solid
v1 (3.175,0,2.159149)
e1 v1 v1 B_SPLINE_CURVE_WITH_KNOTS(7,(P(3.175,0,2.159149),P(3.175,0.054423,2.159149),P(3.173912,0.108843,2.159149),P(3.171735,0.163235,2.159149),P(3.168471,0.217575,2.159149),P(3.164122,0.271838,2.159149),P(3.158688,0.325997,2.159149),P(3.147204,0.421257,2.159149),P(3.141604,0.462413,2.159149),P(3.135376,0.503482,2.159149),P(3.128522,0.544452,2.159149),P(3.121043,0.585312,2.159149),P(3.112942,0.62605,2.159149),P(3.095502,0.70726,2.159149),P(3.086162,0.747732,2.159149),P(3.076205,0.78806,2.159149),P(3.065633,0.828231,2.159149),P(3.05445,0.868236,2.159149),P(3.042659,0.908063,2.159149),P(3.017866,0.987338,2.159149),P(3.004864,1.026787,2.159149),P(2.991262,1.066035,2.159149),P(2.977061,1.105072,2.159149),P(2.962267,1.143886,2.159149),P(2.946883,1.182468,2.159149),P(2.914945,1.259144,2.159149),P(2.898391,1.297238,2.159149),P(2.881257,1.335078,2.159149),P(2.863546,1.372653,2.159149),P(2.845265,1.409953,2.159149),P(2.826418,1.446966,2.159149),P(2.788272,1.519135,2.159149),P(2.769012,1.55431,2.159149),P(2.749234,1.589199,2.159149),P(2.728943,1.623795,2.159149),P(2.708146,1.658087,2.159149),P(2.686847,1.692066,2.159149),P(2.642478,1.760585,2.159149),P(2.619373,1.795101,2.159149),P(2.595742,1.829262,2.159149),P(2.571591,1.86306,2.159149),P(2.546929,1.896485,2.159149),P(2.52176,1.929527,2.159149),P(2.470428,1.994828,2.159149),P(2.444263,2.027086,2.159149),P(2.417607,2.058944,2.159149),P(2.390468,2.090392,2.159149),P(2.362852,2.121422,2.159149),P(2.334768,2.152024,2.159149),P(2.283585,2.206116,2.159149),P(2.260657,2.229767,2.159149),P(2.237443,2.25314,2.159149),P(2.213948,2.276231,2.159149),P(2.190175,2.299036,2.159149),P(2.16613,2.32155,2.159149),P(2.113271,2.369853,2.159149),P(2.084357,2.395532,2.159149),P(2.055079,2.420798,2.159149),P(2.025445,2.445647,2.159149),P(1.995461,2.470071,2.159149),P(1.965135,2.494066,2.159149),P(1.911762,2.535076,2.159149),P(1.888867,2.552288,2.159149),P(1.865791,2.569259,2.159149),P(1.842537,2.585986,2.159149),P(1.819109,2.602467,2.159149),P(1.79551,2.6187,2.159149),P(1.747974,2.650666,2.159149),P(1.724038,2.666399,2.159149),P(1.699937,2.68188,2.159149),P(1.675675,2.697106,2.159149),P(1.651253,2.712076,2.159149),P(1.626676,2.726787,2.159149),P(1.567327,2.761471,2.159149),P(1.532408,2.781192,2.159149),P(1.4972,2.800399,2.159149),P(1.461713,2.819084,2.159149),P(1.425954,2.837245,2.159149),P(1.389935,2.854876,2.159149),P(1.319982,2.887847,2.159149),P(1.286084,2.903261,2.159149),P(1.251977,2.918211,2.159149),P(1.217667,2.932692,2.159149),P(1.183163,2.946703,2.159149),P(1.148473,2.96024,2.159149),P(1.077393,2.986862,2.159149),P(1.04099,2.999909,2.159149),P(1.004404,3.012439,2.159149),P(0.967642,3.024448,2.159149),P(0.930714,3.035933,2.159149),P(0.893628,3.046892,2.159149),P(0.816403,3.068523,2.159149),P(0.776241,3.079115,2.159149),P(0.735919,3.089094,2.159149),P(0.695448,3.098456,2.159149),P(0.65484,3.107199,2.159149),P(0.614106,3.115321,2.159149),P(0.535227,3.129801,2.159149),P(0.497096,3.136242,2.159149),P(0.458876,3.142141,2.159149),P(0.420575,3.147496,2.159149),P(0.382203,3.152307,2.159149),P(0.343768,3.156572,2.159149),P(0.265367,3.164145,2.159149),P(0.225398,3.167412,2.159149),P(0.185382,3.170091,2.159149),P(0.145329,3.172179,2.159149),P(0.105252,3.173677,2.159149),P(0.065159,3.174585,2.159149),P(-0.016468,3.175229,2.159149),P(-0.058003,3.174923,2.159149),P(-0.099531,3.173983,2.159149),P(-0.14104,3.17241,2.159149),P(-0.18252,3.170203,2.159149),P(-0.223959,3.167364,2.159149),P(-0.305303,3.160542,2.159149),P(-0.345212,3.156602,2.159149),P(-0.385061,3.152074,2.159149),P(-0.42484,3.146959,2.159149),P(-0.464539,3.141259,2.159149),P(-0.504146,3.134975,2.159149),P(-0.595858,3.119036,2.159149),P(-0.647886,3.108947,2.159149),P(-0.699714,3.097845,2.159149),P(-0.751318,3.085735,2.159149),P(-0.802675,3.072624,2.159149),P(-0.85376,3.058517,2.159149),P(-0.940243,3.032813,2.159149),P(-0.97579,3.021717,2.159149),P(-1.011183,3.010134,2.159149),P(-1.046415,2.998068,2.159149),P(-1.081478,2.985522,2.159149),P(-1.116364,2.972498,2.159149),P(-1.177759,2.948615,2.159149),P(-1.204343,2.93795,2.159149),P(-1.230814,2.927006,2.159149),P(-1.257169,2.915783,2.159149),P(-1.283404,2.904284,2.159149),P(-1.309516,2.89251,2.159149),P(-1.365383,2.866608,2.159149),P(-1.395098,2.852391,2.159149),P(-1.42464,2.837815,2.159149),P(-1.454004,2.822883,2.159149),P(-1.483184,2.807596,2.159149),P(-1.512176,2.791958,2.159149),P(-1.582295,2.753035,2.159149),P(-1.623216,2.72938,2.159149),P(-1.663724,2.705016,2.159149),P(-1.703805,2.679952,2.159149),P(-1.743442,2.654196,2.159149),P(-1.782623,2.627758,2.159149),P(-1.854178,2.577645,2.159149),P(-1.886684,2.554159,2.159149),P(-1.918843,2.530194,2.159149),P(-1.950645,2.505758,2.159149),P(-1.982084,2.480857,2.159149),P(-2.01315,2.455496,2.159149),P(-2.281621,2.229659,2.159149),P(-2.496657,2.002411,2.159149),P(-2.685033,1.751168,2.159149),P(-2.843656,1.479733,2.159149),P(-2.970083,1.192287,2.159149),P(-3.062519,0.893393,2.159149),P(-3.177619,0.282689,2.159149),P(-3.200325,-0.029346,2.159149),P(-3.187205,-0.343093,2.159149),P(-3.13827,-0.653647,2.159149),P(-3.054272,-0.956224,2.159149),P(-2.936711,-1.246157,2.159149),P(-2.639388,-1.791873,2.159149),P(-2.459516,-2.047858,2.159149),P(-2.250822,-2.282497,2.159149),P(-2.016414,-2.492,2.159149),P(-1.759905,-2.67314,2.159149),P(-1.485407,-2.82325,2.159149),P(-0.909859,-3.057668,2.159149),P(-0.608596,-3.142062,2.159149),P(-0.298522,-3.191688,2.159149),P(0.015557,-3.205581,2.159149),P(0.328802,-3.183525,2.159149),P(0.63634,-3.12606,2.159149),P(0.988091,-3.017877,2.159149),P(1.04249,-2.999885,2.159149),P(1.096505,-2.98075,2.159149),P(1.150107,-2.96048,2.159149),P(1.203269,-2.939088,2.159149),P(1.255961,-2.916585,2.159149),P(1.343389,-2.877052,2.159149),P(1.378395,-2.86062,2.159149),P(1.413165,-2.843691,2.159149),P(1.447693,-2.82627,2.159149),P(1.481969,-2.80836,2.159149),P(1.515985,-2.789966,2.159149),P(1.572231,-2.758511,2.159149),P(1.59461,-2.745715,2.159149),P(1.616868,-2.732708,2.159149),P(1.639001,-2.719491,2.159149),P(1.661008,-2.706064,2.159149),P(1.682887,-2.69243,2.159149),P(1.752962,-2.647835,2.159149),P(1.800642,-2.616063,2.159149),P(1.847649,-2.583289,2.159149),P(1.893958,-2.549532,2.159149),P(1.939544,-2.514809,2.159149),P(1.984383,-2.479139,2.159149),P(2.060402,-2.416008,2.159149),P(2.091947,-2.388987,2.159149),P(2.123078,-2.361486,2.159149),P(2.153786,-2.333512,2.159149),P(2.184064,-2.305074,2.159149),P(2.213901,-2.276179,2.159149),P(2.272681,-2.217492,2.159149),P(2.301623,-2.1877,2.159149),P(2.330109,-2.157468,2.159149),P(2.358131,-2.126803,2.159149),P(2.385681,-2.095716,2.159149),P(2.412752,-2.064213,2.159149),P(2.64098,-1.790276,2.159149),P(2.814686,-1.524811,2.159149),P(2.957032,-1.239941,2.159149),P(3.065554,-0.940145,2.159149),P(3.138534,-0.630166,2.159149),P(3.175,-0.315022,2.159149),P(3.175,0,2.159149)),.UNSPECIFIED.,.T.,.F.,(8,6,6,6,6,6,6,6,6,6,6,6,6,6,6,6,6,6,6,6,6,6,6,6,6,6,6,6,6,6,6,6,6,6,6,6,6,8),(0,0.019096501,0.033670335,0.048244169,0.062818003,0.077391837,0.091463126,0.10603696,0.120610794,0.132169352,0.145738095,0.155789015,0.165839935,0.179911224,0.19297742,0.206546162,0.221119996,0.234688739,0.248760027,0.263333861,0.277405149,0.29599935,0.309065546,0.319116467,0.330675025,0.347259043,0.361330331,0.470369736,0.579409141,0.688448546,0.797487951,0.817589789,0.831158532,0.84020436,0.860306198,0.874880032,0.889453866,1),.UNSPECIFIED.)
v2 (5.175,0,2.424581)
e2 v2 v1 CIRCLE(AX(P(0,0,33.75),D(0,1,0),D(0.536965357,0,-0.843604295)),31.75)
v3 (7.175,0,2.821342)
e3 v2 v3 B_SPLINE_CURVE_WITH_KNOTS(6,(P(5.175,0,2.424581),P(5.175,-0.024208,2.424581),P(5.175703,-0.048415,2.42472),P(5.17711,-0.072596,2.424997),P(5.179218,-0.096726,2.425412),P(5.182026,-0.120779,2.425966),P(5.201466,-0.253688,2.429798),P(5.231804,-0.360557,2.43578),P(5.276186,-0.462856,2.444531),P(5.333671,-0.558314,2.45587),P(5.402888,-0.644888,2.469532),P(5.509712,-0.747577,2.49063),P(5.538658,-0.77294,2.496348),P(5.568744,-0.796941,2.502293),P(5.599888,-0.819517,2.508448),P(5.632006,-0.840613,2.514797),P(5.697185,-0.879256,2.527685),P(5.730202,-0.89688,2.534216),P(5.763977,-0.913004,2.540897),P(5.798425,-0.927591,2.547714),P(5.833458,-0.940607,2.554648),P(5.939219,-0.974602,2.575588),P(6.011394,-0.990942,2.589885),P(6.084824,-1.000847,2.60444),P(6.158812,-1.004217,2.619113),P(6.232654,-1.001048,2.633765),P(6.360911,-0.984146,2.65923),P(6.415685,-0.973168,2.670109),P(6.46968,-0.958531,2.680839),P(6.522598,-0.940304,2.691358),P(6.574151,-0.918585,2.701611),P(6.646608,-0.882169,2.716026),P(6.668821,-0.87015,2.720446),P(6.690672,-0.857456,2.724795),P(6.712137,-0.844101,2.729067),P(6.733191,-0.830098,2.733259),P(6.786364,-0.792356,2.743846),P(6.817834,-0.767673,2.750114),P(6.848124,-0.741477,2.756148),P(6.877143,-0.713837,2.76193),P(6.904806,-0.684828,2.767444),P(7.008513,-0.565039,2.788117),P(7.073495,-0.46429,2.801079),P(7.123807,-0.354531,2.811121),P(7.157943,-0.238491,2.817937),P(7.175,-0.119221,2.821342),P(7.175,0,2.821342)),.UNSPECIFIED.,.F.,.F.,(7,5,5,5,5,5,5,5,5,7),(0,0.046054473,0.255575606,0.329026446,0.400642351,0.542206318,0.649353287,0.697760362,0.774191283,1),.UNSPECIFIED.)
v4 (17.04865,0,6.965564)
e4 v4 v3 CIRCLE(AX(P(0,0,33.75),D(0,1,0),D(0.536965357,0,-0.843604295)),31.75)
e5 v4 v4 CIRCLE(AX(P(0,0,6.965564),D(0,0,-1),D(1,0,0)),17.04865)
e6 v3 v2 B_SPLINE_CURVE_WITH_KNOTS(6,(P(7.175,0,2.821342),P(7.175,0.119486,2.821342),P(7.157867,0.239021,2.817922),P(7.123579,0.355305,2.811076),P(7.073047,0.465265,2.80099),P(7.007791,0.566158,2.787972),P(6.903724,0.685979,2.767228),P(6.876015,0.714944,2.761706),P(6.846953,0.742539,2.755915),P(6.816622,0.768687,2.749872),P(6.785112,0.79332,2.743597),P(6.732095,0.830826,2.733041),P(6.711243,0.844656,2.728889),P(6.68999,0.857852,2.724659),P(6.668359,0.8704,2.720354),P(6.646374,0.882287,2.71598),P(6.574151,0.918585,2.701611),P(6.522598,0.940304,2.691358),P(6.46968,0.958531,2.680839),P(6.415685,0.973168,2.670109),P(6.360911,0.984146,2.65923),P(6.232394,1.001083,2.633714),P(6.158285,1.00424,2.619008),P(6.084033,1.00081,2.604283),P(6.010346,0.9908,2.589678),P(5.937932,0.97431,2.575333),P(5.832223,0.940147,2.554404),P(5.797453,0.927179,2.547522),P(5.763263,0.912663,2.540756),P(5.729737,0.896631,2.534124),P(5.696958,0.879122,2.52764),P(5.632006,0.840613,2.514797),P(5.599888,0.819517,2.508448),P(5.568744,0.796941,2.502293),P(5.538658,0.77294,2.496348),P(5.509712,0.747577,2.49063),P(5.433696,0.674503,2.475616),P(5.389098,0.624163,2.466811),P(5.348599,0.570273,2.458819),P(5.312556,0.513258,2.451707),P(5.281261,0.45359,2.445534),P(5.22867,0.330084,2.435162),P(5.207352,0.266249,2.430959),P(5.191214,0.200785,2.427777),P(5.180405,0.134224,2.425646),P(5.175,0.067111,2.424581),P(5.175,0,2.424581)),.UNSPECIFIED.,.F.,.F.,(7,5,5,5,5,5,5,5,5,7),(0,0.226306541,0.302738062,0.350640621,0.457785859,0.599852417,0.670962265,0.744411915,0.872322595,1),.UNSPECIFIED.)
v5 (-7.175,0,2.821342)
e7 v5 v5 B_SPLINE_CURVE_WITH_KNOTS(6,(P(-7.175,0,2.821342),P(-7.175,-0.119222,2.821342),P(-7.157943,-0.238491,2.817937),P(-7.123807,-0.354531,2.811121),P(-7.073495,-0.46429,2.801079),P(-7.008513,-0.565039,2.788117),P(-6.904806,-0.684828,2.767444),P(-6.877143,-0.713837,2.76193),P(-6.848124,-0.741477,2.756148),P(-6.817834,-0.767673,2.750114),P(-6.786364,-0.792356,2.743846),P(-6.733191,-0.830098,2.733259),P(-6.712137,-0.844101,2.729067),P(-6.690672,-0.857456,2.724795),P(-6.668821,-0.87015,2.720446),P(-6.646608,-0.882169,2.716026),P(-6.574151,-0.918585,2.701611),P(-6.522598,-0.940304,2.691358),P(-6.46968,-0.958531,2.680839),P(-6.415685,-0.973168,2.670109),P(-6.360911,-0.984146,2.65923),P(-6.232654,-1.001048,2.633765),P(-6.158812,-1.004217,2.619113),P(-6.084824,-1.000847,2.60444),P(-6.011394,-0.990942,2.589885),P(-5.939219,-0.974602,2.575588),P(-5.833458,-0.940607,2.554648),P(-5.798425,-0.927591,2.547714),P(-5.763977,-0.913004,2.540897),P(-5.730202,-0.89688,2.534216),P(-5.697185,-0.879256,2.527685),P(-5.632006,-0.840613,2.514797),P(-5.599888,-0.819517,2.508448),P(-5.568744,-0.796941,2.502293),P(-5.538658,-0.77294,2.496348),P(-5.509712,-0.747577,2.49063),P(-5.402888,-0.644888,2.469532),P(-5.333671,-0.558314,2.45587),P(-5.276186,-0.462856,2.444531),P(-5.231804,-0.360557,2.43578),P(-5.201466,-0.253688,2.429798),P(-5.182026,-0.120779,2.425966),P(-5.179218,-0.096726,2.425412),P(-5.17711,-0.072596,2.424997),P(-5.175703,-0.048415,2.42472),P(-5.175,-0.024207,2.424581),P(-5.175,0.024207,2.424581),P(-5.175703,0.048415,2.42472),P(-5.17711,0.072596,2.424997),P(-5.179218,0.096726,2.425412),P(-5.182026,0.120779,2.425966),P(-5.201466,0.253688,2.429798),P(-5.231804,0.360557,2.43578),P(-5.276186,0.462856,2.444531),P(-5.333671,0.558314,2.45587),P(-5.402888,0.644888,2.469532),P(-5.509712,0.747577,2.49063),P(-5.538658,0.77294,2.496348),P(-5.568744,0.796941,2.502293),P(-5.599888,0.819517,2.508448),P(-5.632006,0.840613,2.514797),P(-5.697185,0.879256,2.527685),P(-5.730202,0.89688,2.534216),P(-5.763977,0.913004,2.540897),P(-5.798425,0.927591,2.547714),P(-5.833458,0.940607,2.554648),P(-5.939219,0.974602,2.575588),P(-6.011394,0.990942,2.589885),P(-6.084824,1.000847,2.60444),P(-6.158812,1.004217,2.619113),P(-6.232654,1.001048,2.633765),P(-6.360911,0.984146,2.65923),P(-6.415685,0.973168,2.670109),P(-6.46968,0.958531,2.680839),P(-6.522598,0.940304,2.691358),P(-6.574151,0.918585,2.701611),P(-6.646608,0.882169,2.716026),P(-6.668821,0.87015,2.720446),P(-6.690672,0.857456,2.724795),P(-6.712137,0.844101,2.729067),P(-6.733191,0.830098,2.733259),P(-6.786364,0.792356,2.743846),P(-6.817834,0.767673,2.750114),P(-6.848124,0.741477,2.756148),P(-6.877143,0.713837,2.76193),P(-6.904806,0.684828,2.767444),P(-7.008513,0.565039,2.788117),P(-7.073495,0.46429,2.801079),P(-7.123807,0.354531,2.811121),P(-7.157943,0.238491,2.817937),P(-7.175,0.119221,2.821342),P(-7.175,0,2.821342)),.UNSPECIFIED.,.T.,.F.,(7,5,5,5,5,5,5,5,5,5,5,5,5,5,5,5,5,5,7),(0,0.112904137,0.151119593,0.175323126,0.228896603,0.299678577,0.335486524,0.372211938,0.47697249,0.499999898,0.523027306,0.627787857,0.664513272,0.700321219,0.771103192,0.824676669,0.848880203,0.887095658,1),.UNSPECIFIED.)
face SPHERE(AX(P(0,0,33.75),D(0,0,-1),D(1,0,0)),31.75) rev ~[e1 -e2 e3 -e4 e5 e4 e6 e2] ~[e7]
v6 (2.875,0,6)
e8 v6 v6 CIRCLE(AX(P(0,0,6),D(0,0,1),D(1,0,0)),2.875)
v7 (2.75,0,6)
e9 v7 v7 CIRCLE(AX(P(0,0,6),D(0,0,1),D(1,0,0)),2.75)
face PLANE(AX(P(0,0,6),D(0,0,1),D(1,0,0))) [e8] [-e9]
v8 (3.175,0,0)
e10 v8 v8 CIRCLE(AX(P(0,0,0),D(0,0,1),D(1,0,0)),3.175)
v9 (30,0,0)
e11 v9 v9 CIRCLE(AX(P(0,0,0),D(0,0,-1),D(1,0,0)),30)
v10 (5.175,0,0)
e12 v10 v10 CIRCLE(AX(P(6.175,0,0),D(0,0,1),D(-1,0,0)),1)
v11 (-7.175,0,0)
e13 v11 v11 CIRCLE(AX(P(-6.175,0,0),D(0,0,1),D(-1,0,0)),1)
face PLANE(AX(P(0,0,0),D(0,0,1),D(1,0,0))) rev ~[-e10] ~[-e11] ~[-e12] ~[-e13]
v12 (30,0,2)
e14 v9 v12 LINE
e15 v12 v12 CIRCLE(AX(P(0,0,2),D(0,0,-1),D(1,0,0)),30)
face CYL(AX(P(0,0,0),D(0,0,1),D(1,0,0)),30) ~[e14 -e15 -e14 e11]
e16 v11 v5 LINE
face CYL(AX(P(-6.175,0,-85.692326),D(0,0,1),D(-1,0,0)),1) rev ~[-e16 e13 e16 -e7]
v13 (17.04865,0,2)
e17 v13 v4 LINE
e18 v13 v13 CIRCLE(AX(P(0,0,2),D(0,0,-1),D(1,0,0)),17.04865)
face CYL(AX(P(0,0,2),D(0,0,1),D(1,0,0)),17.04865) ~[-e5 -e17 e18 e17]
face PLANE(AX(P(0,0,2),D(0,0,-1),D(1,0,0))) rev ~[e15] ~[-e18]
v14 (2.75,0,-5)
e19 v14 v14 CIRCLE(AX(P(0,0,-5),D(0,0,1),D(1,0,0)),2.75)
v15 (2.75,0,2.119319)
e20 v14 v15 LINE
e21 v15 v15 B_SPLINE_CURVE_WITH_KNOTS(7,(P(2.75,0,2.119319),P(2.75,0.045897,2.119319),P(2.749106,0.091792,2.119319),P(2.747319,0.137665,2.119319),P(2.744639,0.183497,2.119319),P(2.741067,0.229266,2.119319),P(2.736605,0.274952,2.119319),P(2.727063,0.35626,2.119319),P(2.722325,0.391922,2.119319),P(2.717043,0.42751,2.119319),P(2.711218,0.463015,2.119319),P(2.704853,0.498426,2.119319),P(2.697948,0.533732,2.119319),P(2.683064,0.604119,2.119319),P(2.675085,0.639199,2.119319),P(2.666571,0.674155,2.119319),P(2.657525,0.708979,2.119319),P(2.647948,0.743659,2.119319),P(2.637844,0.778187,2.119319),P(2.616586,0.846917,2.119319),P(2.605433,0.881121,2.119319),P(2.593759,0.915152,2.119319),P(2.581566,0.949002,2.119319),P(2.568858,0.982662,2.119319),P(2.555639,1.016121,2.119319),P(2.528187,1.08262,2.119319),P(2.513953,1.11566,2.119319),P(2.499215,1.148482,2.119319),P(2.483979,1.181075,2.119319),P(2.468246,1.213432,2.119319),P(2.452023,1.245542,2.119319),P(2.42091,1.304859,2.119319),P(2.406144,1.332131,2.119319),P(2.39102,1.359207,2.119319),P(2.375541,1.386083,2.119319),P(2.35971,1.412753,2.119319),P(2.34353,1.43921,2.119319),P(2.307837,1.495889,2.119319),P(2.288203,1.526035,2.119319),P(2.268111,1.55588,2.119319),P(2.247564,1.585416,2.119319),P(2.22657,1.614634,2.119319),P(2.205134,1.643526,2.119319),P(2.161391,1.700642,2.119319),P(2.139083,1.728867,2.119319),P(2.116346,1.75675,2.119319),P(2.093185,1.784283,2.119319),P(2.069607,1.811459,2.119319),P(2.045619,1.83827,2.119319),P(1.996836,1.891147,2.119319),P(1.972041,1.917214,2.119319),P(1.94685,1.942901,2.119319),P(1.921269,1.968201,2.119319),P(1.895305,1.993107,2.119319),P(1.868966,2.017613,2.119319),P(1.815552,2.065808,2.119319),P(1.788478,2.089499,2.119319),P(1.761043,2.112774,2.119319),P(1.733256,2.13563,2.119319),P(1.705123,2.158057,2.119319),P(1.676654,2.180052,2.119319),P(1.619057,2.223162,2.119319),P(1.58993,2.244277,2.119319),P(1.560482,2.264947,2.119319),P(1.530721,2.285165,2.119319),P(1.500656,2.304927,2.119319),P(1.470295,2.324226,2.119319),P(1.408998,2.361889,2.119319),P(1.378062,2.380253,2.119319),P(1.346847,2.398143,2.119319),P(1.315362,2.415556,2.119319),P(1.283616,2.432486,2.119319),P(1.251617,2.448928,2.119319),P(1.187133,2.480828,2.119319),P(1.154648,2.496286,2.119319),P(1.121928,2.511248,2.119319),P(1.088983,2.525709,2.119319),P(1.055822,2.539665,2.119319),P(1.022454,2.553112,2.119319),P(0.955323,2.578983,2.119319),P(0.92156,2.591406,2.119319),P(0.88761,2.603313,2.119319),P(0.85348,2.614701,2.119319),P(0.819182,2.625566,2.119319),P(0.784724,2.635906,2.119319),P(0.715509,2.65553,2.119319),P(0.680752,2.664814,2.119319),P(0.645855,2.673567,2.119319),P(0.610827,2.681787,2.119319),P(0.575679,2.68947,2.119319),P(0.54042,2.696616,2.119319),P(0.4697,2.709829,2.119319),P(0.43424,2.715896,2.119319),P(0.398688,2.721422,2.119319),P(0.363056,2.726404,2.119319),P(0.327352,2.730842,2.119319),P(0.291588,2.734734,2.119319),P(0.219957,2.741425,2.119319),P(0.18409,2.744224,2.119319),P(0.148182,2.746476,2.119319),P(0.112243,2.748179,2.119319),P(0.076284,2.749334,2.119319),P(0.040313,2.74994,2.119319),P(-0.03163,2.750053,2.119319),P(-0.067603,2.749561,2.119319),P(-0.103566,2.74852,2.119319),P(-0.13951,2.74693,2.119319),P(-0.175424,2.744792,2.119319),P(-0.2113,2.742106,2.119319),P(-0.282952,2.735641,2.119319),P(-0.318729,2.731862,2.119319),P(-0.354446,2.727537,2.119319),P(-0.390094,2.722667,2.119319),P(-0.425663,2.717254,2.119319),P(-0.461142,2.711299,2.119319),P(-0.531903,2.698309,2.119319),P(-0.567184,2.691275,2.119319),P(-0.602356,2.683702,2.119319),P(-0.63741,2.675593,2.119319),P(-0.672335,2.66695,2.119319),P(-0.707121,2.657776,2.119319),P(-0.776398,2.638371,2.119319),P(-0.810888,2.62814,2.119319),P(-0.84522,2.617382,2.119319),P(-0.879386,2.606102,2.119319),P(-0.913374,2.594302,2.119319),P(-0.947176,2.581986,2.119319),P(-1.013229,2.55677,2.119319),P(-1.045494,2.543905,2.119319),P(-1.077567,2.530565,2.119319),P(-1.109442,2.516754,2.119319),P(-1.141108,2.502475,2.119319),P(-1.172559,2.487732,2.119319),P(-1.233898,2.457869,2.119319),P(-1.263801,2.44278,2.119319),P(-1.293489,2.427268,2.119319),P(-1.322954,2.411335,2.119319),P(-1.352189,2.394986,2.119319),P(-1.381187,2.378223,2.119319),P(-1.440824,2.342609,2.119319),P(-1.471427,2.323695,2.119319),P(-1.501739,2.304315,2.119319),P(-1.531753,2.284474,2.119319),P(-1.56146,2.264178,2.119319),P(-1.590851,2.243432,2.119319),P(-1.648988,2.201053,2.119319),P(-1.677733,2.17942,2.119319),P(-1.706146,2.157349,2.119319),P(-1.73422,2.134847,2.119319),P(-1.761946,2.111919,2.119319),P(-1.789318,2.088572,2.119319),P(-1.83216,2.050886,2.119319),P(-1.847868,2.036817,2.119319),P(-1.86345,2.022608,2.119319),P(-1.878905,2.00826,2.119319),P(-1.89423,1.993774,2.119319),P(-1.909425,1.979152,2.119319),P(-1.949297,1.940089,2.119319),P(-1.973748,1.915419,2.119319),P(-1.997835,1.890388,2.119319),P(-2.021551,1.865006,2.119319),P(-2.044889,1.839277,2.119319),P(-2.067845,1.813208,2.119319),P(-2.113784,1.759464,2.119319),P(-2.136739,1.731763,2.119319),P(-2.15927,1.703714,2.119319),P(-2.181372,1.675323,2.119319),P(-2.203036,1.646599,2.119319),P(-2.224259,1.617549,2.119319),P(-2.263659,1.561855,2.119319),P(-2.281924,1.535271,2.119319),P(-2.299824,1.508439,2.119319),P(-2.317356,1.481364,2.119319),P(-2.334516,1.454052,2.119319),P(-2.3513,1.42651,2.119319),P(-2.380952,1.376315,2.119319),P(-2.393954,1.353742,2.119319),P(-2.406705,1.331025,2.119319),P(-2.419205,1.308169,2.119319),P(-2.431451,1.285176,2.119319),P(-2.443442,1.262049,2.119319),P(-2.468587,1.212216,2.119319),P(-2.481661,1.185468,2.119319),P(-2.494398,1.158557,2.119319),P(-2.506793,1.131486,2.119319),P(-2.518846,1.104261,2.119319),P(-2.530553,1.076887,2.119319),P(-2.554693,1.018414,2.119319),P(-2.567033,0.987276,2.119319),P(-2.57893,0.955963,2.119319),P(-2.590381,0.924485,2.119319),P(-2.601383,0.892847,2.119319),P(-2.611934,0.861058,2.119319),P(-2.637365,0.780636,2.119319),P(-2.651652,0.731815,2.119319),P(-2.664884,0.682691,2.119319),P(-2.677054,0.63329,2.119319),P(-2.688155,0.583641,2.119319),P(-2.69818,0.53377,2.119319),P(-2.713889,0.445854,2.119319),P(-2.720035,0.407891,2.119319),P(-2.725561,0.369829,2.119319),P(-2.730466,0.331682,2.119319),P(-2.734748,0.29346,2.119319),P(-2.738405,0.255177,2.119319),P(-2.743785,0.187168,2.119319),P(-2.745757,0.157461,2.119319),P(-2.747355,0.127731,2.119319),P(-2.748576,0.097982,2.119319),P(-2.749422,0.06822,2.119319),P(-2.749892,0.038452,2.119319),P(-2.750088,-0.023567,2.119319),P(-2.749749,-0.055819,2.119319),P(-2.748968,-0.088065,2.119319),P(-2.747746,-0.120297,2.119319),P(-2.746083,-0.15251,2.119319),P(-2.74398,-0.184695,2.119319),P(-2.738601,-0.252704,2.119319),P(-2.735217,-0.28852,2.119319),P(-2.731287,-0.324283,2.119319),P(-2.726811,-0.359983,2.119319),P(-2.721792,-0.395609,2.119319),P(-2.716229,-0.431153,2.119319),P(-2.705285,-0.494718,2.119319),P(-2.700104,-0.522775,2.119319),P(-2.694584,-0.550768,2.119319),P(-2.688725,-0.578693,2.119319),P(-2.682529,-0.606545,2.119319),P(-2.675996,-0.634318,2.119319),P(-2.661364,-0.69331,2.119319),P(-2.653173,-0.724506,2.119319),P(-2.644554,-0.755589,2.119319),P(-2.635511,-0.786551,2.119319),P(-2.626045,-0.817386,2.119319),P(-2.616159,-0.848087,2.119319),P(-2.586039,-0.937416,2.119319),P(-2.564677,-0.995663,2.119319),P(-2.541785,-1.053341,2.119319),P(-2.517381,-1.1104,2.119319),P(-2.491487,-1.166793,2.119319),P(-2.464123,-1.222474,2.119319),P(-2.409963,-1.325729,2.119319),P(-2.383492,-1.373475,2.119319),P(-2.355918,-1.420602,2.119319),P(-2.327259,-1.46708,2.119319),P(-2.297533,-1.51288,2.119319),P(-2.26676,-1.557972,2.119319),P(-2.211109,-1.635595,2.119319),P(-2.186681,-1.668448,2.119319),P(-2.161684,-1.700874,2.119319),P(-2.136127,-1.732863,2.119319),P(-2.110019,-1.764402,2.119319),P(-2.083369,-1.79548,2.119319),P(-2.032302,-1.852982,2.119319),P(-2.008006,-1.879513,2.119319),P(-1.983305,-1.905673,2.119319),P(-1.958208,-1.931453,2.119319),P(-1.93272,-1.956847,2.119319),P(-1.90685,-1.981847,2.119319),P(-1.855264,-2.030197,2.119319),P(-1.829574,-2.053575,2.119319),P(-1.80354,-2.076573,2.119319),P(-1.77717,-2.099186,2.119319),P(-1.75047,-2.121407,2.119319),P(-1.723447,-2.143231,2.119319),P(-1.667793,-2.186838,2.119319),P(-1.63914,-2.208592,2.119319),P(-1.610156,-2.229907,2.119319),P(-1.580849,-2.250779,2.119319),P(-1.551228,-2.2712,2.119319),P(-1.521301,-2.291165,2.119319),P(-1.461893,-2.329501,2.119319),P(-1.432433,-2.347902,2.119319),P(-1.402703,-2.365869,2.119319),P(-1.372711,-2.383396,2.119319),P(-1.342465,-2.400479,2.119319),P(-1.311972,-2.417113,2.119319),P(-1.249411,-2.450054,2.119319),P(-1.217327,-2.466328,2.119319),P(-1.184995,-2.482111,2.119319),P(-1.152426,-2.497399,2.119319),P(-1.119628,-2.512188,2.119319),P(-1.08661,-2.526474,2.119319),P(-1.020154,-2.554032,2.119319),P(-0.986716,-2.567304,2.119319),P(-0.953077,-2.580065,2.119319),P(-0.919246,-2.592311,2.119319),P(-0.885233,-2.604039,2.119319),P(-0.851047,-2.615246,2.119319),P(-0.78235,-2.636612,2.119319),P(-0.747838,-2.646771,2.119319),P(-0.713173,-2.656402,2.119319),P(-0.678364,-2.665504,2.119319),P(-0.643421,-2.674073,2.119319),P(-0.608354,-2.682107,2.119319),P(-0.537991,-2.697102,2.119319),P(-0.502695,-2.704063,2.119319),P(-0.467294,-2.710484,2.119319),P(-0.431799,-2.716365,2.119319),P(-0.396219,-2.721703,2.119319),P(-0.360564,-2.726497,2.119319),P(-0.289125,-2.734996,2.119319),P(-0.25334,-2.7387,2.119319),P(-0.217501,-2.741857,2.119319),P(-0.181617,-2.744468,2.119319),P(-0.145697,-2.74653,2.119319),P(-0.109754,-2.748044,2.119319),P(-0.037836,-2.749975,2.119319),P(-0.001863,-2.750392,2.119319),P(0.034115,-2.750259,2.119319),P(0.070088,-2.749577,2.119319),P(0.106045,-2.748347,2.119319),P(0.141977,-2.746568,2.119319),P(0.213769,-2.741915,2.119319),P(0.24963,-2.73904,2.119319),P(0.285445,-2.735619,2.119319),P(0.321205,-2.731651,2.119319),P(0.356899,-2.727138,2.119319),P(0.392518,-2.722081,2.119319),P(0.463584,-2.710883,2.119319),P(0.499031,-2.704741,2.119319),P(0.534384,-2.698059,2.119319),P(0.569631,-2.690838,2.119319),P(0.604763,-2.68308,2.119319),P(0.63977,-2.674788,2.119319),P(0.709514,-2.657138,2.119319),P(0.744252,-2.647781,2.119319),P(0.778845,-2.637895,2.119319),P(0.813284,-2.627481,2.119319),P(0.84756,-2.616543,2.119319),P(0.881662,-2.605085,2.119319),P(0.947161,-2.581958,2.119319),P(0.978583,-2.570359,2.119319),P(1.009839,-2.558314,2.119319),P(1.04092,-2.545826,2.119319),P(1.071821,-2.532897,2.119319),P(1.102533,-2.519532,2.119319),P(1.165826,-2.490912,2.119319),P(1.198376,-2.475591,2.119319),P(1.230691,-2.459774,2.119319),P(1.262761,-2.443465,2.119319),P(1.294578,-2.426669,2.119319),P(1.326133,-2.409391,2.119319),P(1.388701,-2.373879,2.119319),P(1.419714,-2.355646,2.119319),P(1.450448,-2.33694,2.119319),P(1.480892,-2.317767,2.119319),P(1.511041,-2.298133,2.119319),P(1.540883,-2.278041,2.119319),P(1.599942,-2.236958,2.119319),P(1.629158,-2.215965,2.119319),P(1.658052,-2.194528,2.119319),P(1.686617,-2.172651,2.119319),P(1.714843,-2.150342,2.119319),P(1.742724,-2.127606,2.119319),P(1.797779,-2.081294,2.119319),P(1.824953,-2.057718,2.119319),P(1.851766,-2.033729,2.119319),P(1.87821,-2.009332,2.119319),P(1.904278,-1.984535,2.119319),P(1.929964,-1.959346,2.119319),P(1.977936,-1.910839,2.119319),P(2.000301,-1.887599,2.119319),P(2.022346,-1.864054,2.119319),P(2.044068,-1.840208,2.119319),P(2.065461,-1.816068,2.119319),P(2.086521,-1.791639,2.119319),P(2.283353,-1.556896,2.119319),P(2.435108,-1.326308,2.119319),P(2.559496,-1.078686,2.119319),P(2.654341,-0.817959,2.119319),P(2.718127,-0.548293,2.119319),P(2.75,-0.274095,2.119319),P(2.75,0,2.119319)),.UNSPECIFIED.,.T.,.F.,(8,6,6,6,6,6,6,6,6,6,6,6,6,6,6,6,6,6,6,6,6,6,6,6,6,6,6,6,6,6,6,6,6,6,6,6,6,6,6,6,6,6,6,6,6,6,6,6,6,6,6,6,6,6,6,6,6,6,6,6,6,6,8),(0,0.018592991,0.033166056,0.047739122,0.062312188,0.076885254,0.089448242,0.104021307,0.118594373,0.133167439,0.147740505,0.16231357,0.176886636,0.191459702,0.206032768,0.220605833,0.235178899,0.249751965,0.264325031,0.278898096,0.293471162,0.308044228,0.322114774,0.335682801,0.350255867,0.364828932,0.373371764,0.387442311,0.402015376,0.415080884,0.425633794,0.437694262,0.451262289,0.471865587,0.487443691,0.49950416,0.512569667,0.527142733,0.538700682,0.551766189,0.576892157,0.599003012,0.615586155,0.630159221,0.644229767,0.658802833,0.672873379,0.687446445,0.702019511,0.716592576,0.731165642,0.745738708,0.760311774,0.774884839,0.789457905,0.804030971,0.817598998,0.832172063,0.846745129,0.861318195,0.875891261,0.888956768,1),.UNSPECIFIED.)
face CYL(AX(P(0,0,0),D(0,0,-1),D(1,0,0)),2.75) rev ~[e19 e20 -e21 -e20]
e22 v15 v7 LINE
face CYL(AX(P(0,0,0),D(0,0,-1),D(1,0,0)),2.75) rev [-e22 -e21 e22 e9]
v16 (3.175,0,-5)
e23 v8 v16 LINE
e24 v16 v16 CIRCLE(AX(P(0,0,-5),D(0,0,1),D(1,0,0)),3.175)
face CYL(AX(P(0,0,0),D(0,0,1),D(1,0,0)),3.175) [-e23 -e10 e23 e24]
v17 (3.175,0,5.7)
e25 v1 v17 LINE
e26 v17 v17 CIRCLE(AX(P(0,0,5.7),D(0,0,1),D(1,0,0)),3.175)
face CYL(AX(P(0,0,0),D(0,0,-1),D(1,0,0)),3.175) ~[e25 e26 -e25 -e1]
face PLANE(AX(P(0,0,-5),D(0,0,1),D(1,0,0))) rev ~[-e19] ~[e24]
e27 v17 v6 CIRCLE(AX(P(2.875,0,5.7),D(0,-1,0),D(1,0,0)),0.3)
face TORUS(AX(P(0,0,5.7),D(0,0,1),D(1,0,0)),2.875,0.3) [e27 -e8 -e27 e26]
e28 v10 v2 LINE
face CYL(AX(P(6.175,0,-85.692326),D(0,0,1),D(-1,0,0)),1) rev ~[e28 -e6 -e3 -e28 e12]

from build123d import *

# Parameters (mm, degrees)
F2_R          = 3.175
F2_R_2        = 2.75
F3_DEPTH      = 6
F3_DEPTH_BACK = 5
F4_R          = 0.3
F5_R          = 2.75
F6_DEPTH      = 6.966563666
F8_D          = 2


with BuildPart() as f1:
    # F0 (on Front) → F1 (revolve)
    with BuildSketch(Plane.XZ):
        Polygon((0, 2), (0, 0), (30, 0), (30, 2), (17.0486500744, 2), align=None)
        with BuildLine():
            ThreePointArc((17.0486500744, 6.965563649), (8.8785315808, 3.2666573852), (1.21e-08, 2))
            Line((1.21e-08, 2), (17.0486500744, 2))
            Line((17.0486500744, 2), (17.0486500744, 6.965563649))
        make_face()
    revolve(axis=Axis((0, 0, 32.75), (0, 0, -1)))

    # F2 (on Top) → F3 (join, two sides)
    with BuildSketch(Plane.XY) as f3_sk:
        Circle(F2_R)
        Circle(F2_R_2, mode=Mode.SUBTRACT)
    extrude(amount=F3_DEPTH)
    extrude(f3_sk.sketch, amount=-F3_DEPTH_BACK)

    # F4
    f4_edges = [f1.edges().sort_by_distance(p)[0] for p in [
        (-3.175, 0, 6),
    ]]
    fillet(f4_edges, radius=F4_R)

    # F5 (on face) → F6 (cut, through all)
    with BuildSketch(Plane(origin=(0, 0, 0), x_dir=(1, 0, 0), z_dir=(0, 0, -1))):
        Circle(F5_R)
    extrude(amount=-F6_DEPTH, mode=Mode.SUBTRACT)

    # F8 (through all)
    with Locations(Plane(origin=(0, 0, 0), x_dir=(1, 0, 0), z_dir=(0, 0, -1))):
        with Locations((-6.175, 0), (6.175, 0)):
            Hole(F8_D / 2)


solid = f1.part
